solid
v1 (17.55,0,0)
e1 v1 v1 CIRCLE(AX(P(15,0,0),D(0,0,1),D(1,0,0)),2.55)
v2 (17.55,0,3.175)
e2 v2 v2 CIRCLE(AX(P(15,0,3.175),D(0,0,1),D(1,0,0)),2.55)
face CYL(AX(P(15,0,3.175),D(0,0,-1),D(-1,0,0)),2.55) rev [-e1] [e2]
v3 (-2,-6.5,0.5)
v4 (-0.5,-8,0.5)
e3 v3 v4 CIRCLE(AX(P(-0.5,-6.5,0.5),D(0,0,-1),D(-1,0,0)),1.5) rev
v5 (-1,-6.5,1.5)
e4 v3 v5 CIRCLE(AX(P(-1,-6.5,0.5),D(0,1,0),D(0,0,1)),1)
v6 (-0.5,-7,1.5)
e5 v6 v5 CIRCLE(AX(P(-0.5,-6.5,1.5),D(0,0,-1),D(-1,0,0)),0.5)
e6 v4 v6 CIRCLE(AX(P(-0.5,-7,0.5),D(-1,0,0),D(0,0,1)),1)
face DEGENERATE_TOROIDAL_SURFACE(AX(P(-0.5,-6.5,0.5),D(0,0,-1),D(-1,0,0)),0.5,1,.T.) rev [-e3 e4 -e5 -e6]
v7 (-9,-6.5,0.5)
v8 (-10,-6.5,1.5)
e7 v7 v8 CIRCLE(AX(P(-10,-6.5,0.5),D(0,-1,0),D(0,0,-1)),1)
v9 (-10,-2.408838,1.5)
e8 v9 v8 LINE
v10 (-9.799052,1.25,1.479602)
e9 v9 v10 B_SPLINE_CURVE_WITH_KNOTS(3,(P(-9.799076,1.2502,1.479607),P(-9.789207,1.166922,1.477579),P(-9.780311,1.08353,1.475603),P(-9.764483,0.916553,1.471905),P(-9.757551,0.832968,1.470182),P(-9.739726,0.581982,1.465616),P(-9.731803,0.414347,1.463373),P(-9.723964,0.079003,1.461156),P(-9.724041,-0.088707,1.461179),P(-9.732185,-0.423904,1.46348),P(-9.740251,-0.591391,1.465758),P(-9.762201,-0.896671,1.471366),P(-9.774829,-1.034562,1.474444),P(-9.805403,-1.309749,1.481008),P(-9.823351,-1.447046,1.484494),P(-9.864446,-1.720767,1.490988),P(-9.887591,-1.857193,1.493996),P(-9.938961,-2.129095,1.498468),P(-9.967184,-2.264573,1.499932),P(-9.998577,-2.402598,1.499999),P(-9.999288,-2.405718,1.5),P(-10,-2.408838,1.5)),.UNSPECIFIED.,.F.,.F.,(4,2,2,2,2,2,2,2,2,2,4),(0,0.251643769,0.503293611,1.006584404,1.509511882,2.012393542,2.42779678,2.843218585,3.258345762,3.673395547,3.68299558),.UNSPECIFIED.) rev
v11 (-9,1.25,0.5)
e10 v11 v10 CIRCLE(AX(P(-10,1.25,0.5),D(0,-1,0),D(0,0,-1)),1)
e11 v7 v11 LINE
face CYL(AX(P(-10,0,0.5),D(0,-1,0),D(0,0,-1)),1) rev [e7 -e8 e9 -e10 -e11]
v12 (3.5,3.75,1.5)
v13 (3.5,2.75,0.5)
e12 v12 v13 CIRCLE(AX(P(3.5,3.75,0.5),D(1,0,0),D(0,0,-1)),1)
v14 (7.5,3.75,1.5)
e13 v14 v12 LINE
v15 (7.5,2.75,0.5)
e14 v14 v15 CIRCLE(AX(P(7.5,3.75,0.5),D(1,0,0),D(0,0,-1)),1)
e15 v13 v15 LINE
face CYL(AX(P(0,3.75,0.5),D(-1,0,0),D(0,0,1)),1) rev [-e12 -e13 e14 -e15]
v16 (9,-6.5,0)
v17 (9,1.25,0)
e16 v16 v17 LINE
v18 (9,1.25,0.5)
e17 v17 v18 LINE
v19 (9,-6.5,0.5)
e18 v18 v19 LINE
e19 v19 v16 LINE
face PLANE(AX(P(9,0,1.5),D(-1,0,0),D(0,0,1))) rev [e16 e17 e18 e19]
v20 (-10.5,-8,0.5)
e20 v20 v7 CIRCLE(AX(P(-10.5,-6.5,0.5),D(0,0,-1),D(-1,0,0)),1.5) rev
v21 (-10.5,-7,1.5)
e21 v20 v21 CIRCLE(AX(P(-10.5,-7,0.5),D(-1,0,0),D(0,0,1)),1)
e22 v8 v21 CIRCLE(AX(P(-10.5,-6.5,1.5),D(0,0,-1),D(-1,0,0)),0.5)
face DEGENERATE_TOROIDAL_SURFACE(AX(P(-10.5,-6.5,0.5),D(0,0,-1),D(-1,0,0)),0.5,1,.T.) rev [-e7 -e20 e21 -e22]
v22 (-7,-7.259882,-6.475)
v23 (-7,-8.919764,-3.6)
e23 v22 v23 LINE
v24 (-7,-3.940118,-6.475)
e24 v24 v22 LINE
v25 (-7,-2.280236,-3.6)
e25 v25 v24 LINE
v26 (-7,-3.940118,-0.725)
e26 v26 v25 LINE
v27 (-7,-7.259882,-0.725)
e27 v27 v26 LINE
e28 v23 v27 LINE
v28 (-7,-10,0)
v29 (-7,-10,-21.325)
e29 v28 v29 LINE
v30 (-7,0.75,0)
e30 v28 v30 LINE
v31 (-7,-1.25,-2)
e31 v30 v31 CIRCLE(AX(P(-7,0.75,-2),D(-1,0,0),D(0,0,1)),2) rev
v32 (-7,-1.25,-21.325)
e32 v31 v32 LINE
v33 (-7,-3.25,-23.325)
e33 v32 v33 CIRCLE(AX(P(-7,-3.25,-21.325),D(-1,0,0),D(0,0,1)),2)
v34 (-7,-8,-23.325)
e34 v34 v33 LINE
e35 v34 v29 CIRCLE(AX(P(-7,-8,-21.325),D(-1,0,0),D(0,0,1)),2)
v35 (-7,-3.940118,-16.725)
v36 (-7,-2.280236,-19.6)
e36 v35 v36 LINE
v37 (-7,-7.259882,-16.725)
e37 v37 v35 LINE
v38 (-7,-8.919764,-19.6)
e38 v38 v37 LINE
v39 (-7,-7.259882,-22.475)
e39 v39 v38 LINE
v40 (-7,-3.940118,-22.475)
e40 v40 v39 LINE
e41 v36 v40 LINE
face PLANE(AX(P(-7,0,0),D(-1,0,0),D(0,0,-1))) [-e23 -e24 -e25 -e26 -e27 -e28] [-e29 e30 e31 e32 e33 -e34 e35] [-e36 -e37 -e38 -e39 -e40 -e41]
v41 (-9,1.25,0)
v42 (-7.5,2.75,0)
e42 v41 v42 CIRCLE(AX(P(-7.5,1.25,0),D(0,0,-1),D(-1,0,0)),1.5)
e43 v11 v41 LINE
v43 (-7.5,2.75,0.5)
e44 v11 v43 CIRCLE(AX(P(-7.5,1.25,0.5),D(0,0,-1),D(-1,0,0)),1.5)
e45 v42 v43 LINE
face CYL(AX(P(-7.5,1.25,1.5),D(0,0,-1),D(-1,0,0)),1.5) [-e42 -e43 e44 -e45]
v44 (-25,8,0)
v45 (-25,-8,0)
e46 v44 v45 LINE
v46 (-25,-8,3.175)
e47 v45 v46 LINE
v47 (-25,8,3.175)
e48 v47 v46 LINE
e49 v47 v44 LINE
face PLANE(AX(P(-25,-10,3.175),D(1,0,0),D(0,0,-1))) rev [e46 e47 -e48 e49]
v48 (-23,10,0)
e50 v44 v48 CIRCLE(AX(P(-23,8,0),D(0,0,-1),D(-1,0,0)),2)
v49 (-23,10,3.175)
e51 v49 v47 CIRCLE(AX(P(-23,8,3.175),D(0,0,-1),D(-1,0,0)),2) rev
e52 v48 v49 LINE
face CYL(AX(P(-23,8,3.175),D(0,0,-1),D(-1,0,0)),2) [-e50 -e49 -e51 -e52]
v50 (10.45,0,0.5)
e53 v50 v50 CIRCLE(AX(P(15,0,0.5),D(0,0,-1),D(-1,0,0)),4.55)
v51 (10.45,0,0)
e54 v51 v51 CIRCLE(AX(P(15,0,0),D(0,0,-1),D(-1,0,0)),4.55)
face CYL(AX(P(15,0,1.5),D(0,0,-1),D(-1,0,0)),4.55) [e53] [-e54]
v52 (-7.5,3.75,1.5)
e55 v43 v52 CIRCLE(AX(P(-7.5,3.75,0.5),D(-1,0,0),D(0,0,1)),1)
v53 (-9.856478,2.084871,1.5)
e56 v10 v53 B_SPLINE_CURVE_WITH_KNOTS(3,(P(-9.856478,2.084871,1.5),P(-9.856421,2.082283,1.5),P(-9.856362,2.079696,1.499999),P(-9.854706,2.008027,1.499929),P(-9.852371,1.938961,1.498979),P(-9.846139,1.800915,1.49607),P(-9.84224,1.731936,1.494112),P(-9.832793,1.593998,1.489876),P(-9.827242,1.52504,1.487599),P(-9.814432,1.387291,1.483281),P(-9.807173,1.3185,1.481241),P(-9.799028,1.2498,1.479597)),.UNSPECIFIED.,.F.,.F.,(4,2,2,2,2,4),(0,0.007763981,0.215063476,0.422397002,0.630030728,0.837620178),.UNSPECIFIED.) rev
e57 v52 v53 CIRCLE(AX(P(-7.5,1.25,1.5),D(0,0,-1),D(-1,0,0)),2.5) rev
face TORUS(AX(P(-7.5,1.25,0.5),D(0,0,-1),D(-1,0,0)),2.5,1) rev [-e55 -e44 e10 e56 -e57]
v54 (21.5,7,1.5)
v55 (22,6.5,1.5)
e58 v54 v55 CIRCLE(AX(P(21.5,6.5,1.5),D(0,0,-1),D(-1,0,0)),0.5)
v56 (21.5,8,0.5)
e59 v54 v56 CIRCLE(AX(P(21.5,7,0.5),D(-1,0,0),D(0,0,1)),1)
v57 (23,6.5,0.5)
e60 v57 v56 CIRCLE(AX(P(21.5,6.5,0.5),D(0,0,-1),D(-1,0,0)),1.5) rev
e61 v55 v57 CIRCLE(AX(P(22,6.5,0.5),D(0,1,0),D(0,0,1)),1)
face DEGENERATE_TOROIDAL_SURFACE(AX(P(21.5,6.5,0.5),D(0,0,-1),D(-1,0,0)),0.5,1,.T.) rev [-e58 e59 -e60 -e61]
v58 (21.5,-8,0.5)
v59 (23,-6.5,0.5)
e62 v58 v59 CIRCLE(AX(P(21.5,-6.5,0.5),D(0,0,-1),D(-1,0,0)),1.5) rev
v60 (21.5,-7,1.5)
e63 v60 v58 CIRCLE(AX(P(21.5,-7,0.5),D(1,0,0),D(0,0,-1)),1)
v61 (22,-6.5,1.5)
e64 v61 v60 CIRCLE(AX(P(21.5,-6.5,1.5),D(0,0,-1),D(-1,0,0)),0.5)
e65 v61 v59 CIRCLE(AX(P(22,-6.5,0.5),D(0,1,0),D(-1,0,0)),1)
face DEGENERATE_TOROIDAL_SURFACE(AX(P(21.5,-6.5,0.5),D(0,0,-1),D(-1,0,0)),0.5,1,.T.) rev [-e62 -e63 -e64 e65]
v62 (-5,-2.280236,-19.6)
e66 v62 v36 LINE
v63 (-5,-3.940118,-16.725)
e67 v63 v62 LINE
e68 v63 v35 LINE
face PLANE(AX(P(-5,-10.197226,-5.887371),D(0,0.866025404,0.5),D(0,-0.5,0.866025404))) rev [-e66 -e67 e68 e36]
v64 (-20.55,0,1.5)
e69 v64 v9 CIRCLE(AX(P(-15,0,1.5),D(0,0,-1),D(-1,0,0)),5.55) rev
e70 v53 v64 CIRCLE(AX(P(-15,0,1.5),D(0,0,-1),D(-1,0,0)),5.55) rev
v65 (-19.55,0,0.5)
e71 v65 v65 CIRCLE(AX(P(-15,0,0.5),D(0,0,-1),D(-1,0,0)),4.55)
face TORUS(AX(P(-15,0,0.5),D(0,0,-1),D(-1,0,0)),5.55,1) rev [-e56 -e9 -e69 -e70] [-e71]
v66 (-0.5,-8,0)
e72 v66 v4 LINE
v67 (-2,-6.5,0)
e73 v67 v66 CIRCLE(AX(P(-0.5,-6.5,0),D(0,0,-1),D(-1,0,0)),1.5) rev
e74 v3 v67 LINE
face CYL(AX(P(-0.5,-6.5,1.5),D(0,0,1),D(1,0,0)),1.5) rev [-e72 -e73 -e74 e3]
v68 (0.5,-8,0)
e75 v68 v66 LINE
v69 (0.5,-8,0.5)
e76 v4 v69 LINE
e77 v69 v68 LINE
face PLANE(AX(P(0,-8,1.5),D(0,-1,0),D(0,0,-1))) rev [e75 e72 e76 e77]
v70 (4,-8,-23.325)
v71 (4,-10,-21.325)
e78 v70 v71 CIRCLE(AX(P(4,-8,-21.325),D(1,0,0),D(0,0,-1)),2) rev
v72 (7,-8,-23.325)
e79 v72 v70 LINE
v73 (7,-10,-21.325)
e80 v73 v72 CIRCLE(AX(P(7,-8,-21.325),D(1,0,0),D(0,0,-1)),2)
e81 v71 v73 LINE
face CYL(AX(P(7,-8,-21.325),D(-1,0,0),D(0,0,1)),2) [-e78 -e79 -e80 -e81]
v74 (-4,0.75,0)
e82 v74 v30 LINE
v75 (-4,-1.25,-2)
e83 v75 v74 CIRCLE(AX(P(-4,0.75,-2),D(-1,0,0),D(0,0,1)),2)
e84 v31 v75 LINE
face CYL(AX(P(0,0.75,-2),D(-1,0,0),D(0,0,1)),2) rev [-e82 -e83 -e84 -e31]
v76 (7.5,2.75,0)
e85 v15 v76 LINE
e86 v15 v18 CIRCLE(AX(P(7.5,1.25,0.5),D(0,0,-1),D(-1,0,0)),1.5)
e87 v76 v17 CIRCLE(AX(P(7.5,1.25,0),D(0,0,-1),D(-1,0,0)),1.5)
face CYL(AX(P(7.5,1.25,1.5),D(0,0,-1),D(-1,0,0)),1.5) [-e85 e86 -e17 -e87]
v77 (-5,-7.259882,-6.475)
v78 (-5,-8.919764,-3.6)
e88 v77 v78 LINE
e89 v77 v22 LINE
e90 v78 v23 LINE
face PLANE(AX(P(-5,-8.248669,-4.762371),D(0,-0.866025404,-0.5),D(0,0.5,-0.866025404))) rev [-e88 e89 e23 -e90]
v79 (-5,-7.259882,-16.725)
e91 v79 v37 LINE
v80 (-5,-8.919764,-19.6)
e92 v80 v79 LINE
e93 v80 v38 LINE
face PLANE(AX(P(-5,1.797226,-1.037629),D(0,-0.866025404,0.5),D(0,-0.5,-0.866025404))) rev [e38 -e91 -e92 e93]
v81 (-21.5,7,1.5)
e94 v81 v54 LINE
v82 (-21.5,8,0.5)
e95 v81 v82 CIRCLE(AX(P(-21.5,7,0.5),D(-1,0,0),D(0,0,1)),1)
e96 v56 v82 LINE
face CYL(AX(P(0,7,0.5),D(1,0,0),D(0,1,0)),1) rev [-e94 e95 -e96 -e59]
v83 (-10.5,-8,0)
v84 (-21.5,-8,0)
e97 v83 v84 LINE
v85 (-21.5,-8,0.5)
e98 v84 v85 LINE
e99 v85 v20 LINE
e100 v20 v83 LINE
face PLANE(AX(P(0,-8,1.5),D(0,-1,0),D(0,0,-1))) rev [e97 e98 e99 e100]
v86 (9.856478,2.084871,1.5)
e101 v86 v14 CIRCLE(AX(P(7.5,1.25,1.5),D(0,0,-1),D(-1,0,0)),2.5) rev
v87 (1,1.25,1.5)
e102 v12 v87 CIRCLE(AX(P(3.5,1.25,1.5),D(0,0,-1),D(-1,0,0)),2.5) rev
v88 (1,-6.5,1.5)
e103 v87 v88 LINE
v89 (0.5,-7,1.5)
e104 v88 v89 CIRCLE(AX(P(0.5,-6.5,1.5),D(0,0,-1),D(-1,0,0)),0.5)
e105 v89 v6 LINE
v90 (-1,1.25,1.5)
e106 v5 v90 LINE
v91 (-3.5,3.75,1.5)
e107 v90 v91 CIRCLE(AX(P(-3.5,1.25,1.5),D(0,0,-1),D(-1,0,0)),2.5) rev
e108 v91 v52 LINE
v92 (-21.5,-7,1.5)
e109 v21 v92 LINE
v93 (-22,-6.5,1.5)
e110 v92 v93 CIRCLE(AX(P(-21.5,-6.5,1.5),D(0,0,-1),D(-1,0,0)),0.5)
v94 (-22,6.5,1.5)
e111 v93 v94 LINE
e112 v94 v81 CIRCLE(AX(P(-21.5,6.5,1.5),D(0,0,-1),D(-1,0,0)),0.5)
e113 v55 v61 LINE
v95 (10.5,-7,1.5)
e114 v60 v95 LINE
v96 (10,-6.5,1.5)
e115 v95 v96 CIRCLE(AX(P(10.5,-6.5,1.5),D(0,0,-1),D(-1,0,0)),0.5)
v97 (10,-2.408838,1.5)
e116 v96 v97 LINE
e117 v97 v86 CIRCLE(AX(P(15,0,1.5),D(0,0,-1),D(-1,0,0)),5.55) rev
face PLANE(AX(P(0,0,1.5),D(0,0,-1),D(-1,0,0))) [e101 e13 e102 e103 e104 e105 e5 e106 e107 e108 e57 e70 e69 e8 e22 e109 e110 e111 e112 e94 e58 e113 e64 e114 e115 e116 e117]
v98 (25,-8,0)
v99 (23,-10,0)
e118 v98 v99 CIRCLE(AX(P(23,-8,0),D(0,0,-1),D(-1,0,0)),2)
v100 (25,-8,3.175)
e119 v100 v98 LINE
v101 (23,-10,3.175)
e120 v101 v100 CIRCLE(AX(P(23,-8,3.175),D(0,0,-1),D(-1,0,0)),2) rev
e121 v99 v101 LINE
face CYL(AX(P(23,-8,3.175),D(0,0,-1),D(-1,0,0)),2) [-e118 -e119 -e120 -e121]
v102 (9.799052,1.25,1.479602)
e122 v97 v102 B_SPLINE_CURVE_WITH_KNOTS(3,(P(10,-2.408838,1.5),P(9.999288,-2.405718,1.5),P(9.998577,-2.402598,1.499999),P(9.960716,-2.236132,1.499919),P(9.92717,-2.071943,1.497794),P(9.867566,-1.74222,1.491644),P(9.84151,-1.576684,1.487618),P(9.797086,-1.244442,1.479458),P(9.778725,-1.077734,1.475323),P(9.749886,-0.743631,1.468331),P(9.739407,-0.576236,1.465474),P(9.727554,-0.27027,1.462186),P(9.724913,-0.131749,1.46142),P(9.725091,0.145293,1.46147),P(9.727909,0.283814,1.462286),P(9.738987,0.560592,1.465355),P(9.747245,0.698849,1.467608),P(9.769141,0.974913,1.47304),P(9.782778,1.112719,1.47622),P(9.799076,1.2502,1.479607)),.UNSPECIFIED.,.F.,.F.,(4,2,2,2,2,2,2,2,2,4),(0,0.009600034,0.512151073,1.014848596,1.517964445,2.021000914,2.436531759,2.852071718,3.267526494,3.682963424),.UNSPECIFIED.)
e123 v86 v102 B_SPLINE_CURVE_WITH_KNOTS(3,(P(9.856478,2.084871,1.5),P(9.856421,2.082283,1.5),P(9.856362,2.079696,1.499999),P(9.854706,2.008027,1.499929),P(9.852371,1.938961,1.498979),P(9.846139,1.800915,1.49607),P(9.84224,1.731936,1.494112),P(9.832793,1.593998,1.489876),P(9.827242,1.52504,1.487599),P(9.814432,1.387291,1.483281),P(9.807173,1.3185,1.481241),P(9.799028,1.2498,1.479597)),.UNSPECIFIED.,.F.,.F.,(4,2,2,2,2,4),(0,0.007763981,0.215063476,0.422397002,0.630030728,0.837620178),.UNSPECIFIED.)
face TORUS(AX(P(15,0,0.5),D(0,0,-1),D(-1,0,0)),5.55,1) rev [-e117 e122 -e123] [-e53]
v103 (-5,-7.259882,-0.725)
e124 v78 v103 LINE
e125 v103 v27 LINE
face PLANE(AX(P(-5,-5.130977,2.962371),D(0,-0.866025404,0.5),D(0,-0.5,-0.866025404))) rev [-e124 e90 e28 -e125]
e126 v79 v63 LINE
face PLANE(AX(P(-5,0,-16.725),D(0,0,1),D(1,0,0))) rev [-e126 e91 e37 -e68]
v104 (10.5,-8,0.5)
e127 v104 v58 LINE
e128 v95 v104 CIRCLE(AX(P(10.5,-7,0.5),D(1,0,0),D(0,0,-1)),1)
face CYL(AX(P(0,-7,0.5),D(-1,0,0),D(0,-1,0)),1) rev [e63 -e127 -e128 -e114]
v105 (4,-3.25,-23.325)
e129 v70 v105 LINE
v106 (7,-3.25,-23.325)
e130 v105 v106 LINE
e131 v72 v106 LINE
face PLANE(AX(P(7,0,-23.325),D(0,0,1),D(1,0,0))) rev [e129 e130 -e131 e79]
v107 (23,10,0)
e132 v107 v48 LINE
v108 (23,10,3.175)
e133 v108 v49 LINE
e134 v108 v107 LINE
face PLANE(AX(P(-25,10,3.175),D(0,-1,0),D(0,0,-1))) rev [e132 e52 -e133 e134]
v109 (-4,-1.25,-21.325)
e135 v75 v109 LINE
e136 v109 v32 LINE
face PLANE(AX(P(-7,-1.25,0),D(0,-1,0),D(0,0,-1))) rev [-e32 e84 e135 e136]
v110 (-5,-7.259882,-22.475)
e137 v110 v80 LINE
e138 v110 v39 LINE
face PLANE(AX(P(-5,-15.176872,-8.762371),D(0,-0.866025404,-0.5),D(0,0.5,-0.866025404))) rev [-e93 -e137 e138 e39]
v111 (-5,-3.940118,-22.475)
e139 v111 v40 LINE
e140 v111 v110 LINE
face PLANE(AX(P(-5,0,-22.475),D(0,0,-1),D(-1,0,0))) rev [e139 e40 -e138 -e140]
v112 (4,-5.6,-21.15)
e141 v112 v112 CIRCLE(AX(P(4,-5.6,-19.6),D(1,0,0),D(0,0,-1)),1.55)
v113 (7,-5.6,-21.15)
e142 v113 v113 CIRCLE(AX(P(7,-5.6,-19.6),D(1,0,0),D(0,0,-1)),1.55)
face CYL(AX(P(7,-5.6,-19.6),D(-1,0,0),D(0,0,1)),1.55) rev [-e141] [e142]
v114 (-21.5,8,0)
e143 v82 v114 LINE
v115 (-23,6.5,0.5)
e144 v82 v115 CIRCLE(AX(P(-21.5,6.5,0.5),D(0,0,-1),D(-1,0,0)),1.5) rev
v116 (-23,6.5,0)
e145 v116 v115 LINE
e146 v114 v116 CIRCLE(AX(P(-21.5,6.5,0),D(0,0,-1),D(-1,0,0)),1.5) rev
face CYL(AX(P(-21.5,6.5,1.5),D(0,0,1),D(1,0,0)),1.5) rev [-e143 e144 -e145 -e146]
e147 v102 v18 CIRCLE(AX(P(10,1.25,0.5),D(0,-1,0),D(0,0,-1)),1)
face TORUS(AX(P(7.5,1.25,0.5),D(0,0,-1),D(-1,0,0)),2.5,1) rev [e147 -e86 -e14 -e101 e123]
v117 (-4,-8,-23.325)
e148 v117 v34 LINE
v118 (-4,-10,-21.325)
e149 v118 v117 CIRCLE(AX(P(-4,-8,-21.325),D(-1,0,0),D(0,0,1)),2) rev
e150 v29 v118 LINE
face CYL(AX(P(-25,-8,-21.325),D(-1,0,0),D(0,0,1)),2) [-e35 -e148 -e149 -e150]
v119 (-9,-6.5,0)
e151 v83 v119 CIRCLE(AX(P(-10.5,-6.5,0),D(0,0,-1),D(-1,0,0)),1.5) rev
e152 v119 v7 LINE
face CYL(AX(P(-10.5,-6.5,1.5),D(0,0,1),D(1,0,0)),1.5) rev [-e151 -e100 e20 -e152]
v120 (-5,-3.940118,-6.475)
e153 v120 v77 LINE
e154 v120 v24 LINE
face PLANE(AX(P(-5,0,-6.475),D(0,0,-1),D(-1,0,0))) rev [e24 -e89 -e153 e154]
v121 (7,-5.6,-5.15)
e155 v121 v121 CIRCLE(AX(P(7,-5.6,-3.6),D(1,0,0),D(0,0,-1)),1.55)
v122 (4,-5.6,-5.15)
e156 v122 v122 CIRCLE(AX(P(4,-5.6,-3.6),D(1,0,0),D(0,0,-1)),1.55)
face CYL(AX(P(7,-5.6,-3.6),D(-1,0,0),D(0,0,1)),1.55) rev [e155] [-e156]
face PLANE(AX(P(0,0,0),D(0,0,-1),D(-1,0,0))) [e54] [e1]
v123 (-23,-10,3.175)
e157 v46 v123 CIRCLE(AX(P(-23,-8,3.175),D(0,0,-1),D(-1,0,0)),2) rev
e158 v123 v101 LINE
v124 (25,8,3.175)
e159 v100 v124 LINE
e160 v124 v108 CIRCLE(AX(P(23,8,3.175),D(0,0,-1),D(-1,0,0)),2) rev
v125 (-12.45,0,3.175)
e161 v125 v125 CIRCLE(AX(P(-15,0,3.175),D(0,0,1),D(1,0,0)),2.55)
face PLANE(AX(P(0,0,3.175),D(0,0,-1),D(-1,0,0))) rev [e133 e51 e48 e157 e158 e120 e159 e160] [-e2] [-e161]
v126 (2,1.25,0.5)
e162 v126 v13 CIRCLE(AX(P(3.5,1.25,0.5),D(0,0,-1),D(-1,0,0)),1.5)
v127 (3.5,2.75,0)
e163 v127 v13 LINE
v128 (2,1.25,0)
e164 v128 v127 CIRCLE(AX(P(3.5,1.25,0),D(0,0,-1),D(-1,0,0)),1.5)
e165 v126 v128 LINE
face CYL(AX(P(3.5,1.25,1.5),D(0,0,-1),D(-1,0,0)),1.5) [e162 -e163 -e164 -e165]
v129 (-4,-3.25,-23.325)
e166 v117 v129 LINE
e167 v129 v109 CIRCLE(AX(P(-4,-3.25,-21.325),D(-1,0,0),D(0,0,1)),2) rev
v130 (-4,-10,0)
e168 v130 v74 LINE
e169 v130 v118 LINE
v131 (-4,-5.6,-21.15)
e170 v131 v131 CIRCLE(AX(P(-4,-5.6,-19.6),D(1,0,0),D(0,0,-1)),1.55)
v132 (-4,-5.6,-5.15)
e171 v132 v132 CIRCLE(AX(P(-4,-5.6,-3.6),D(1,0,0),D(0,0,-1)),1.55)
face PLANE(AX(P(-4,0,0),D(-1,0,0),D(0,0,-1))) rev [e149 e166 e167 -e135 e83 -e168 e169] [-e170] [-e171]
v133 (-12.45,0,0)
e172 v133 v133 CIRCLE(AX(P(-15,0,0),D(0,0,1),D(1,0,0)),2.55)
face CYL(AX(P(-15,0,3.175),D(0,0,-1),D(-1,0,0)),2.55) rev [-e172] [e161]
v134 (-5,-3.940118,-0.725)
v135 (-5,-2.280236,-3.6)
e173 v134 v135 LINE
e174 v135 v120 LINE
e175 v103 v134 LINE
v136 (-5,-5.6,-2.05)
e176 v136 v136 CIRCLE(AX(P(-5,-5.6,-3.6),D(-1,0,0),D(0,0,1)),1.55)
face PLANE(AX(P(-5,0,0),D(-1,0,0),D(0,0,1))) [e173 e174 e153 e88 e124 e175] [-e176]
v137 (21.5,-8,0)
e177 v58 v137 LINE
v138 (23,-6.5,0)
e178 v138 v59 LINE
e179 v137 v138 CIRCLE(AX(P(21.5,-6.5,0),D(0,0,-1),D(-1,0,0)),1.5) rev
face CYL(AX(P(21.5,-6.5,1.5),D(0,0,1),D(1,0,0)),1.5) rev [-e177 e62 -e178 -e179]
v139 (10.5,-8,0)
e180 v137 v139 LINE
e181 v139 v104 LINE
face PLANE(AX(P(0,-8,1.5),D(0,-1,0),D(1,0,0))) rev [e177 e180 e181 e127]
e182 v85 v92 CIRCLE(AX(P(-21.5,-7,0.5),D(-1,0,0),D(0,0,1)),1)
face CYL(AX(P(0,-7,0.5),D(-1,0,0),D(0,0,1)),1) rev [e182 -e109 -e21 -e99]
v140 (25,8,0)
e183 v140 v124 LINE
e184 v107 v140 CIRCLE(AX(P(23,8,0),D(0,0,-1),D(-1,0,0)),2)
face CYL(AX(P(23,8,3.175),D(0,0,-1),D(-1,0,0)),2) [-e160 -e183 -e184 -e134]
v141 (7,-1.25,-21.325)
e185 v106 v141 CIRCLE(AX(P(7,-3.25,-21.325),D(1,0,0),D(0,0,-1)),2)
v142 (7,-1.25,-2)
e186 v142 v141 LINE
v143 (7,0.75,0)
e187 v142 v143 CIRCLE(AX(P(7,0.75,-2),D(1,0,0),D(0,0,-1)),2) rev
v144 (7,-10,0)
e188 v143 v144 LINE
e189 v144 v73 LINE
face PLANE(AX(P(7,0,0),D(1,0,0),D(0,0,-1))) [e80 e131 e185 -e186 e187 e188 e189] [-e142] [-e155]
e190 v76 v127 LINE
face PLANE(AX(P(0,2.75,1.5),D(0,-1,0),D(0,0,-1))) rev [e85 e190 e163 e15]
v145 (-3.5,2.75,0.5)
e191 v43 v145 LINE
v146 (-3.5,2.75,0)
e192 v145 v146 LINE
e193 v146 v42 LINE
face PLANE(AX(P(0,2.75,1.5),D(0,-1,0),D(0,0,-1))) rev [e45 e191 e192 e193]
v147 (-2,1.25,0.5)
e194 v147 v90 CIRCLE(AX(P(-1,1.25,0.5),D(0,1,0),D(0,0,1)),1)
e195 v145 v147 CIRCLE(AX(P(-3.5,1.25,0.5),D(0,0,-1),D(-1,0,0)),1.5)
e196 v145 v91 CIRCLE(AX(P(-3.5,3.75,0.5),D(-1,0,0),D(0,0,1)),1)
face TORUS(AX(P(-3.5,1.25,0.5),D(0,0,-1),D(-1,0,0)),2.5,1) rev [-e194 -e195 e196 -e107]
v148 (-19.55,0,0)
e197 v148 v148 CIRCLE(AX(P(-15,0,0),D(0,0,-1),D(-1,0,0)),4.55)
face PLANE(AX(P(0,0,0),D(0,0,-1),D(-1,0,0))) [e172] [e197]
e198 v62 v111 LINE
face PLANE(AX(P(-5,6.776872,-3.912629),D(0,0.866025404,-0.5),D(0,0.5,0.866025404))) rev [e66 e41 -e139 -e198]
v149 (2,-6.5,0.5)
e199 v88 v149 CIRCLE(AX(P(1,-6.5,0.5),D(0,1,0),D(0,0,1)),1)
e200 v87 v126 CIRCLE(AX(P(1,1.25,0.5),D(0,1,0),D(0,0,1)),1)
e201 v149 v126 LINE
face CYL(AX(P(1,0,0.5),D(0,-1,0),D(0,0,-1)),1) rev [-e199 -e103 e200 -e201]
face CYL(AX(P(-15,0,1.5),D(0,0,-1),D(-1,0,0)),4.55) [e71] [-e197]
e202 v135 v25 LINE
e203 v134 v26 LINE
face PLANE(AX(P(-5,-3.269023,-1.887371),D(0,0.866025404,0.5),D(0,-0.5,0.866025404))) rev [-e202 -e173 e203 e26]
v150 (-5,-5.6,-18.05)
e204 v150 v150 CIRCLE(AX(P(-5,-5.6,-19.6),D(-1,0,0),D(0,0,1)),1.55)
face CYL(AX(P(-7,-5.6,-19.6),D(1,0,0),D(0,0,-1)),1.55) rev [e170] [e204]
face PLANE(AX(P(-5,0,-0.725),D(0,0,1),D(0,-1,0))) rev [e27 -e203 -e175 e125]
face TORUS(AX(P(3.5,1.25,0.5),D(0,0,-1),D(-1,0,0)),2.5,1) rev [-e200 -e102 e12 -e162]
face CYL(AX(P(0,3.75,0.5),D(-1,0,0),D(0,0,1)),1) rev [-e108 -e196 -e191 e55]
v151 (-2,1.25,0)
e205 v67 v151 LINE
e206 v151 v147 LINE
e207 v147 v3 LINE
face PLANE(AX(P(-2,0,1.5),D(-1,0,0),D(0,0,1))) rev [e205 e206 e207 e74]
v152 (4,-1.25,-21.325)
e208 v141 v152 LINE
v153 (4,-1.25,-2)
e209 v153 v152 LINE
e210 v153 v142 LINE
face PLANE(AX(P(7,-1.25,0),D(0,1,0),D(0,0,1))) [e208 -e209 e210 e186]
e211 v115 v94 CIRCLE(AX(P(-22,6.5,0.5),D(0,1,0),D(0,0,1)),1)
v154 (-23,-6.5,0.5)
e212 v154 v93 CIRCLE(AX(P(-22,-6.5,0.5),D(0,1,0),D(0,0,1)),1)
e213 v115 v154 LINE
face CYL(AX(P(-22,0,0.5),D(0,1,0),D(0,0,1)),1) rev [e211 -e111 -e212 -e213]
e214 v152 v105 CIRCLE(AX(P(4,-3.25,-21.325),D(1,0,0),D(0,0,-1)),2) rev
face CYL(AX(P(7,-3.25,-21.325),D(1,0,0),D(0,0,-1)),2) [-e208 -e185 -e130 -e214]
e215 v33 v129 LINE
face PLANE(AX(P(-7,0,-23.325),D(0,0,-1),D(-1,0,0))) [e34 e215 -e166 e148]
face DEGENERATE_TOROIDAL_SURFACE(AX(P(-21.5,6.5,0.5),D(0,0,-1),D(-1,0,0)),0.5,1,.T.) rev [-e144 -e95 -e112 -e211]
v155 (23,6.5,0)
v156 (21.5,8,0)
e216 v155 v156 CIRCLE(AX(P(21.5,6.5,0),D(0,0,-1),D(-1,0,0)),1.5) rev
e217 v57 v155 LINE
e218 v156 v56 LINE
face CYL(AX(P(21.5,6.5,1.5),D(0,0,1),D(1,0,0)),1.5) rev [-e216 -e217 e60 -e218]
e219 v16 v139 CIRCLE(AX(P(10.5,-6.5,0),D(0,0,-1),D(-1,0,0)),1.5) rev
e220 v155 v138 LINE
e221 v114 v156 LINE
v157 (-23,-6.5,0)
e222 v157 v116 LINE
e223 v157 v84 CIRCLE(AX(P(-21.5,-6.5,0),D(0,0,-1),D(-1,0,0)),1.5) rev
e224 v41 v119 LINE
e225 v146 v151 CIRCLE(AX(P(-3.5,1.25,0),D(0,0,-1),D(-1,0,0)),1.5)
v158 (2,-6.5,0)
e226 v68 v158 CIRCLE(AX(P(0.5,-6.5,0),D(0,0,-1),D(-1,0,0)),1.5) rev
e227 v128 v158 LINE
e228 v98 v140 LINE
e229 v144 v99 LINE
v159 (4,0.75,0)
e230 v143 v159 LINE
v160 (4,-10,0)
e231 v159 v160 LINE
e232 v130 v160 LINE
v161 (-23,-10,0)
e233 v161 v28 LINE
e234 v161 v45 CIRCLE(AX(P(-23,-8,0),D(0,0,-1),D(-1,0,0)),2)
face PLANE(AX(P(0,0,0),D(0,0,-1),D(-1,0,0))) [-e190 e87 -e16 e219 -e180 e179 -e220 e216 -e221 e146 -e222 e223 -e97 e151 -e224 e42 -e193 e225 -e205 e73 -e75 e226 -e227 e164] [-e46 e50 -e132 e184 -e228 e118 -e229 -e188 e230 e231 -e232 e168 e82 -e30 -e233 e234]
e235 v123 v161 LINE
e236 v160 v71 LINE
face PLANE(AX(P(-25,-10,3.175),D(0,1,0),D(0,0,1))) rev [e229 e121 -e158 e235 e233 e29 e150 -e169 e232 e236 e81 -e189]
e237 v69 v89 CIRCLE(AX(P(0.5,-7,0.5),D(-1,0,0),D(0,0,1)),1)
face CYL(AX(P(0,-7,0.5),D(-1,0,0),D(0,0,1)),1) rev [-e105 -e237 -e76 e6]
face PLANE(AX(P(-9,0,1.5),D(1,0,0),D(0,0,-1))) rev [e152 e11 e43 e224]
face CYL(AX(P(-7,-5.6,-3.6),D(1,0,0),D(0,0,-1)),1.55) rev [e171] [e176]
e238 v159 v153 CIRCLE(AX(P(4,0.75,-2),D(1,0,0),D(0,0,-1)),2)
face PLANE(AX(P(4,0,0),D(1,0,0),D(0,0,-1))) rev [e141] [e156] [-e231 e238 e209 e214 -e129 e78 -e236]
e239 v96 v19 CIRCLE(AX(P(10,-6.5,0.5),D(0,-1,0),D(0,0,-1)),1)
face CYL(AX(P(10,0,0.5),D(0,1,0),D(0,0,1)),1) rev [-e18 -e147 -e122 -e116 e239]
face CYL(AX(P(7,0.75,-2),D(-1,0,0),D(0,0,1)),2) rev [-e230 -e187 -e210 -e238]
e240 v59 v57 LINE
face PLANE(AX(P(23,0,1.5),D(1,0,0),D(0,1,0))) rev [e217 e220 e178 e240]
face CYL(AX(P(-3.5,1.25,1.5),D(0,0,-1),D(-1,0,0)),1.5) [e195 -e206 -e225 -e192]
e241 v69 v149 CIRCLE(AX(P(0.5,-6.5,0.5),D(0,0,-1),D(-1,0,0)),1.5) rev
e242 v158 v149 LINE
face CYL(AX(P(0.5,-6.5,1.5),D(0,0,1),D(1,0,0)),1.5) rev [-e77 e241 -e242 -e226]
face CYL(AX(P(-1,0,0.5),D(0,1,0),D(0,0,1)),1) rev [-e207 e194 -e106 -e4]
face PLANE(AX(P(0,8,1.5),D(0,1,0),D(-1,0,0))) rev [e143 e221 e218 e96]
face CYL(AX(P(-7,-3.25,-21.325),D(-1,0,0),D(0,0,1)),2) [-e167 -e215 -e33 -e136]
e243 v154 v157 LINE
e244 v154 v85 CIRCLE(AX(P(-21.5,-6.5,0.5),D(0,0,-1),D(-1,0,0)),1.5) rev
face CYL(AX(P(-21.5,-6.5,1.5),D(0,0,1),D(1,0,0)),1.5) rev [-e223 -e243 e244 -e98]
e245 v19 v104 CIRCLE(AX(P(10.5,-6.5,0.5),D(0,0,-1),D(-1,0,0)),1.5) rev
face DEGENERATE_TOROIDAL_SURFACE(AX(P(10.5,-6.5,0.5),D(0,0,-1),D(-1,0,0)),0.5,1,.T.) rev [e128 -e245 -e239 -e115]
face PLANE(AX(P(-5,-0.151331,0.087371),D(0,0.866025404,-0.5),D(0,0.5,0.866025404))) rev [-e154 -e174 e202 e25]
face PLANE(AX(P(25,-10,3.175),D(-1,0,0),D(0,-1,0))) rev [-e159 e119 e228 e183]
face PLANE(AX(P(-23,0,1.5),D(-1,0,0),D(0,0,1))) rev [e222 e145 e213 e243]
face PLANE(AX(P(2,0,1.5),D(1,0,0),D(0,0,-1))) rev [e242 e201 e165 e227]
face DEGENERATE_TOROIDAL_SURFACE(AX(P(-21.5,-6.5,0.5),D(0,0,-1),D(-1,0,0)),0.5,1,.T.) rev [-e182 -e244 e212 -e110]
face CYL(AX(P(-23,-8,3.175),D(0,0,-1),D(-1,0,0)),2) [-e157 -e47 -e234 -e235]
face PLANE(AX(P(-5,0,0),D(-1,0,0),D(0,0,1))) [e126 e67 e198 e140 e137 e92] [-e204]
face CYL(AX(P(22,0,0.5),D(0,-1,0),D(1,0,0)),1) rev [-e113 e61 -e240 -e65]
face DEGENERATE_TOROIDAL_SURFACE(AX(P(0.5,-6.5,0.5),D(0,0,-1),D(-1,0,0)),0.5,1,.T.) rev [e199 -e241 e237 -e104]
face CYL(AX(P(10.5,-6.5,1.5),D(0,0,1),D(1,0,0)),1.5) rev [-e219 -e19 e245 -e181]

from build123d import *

# Parameters (mm, degrees)
SKETCH1_W           = 50
SKETCH1_H           = 20
SKETCH1_R           = 2.55
BOSS_EXTRUDE1_DEPTH = 3.175
BOSS_EXTRUDE2_START = 4
SKETCH3_W           = 26.5
SKETCH3_H           = 8.75
SKETCH3_R           = 1.55
BOSS_EXTRUDE2_DEPTH = 3
CUT_EXTRUDE1_START  = -7
SKETCH3_3_R         = 1.55
CUT_EXTRUDE1_DEPTH  = 2
FILLET1_R           = 2
FILLET2_R           = 2
SKETCH4_R           = 4.55
CUT_EXTRUDE2_DEPTH  = 1.5
FILLET3_R           = 1.5
FILLET4_R           = 1


with BuildPart() as part:
    # Sketch1 → Boss-Extrude1 (new body)
    with BuildSketch(Plane.XY):
        Rectangle(SKETCH1_W, SKETCH1_H)
        with Locations((-15, 0)):
            Circle(SKETCH1_R, mode=Mode.SUBTRACT)
        with Locations((15, 0)):
            Circle(SKETCH1_R, mode=Mode.SUBTRACT)
    extrude(amount=BOSS_EXTRUDE1_DEPTH)

    # Sketch3 → Boss-Extrude2 (add)
    # profile 1 of 3: a face of its own
    with BuildSketch(Plane(origin=(0, 0, 0), x_dir=(0, 0, -1), z_dir=(1, 0, 0)).offset(BOSS_EXTRUDE2_START)):
        with Locations((10.075, -5.625)):
            Rectangle(SKETCH3_W, SKETCH3_H)
        Polygon((22.475, -7.259882024), (22.475, -3.940117976), (19.6, -2.280235952), (16.725, -3.940117976), (16.725, -7.259882024), (19.6, -8.919764048), align=None, mode=Mode.SUBTRACT)
        Polygon((6.475, -7.259882024), (6.475, -3.940117976), (3.6, -2.280235952), (0.725, -3.940117976), (0.725, -7.259882024), (3.6, -8.919764048), align=None, mode=Mode.SUBTRACT)
    # profile 2 of 3: a face of its own
    with BuildSketch(Plane(origin=(0, 0, 0), x_dir=(0, 0, -1), z_dir=(1, 0, 0)).offset(BOSS_EXTRUDE2_START)):
        Polygon((3.6, -8.919764048), (6.475, -7.259882024), (6.475, -3.940117976), (3.6, -2.280235952), (0.725, -3.940117976), (0.725, -7.259882024), align=None)
        with Locations((3.6, -5.6)):
            Circle(SKETCH3_R, mode=Mode.SUBTRACT)
    # profile 3 of 3: a face of its own
    with BuildSketch(Plane(origin=(0, 0, 0), x_dir=(0, 0, -1), z_dir=(1, 0, 0)).offset(BOSS_EXTRUDE2_START)):
        Polygon((19.6, -8.919764048), (22.475, -7.259882024), (22.475, -3.940117976), (19.6, -2.280235952), (16.725, -3.940117976), (16.725, -7.259882024), align=None)
        with Locations((19.6, -5.6)):
            Circle(SKETCH3_R, mode=Mode.SUBTRACT)
    boss_extrude2 = extrude(amount=BOSS_EXTRUDE2_DEPTH)

    # Mirror1: Boss-Extrude2 across plane
    add(boss_extrude2.mirror(Plane(origin=(0, 0, 0), x_dir=(0, 0, 1), z_dir=(1, 0, 0))))

    # Sketch3<3> → Cut-Extrude1 (cut)
    # profile 1 of 2: a face of its own
    with BuildSketch(Plane(origin=(0, 0, 0), x_dir=(0, 0, -1), z_dir=(1, 0, 0)).offset(CUT_EXTRUDE1_START)):
        Polygon((3.6, -8.919764048), (6.475, -7.259882024), (6.475, -3.940117976), (3.6, -2.280235952), (0.725, -3.940117976), (0.725, -7.259882024), align=None)
        with Locations((3.6, -5.6)):
            Circle(SKETCH3_3_R, mode=Mode.SUBTRACT)
    # profile 2 of 2: a face of its own
    with BuildSketch(Plane(origin=(0, 0, 0), x_dir=(0, 0, -1), z_dir=(1, 0, 0)).offset(CUT_EXTRUDE1_START)):
        Polygon((19.6, -8.919764048), (22.475, -7.259882024), (22.475, -3.940117976), (19.6, -2.280235952), (16.725, -3.940117976), (16.725, -7.259882024), align=None)
        with Locations((19.6, -5.6)):
            Circle(SKETCH3_3_R, mode=Mode.SUBTRACT)
    extrude(amount=CUT_EXTRUDE1_DEPTH, mode=Mode.SUBTRACT)

    # Fillet1
    fillet1_edges = [part.edges().sort_by_distance(p)[0] for p in [
        (5.5, -1.25, 0),
        (-5.5, -1.25, 0),
    ]]
    fillet(fillet1_edges, radius=FILLET1_R)

    # Fillet2
    fillet2_edges = [part.edges().sort_by_distance(p)[0] for p in [
        (5.5, -10, -23.325),
        (5.5, -1.25, -23.325),
        (-5.5, -10, -23.325),
        (-5.5, -1.25, -23.325),
        (25, -10, 1.5875),
        (-25, -10, 1.5875),
        (-25, 10, 1.5875),
        (25, 10, 1.5875),
    ]]
    fillet(fillet2_edges, radius=FILLET2_R)

    # Sketch4 → Cut-Extrude2 (cut)
    with BuildSketch(Plane(origin=(0, 0, 0), x_dir=(-1, 0, 0), z_dir=(0, 0, -1))):
        Polygon((9, 2.75), (9, -8), (23, -8), (23, 8), (-23, 8), (-23, -8), (-9, -8), (-9, 2.75), (-2, 2.75), (-2, -8), (2, -8), (2, 2.75), align=None)
        with Locations((15, 0)):
            Circle(SKETCH4_R, mode=Mode.SUBTRACT)
        with Locations((-15, 0)):
            Circle(SKETCH4_R, mode=Mode.SUBTRACT)
    extrude(amount=-CUT_EXTRUDE2_DEPTH, mode=Mode.SUBTRACT)

    # Fillet3
    fillet3_edges = [part.edges().sort_by_distance(p)[0] for p in [
        (-9, -8, 0.75),
        (-9, 2.75, 0.75),
        (-2, 2.75, 0.75),
        (-2, -8, 0.75),
        (2, -8, 0.75),
        (2, 2.75, 0.75),
        (9, 2.75, 0.75),
        (9, -8, 0.75),
        (23, -8, 0.75),
        (23, 8, 0.75),
        (-23, 8, 0.75),
        (-23, -8, 0.75),
    ]]
    fillet(fillet3_edges, radius=FILLET3_R)

    # Fillet4
    # the kernel refuses this fillet: 1 mm, written as the material it adds along each edge
    with BuildSketch(Plane(origin=(-15, 0, 1.5), x_dir=(-1, 0, 0), z_dir=(0, -1, 0))) as fillet4_piece_1:
        with BuildLine():
            CenterArc((4.55 + FILLET4_R, FILLET4_R), FILLET4_R, 180, 90)
            Line((4.55, FILLET4_R), (4.55, 0))
            Line((4.55, 0), (4.55 + FILLET4_R, 0))
        make_face()
    revolve(axis=Axis((-15, 0, 1.5), (0, 0, -1)))
    with BuildSketch(Plane(origin=(15, 0, 1.5), x_dir=(-1, 0, 0), z_dir=(0, -1, 0))) as fillet4_piece_2:
        with BuildLine():
            CenterArc((4.55 + FILLET4_R, FILLET4_R), FILLET4_R, 180, 90)
            Line((4.55, FILLET4_R), (4.55, 0))
            Line((4.55, 0), (4.55 + FILLET4_R, 0))
        make_face()
    revolve(axis=Axis((15, 0, 1.5), (0, 0, -1)))
    with BuildSketch(Plane(origin=(-9, 1.25, 1.5), x_dir=(0, 0, -1), z_dir=(0, -1, 0)), Plane(origin=(-2, -6.5, 1.5), x_dir=(0, 0, -1), z_dir=(0, 1, 0)), Plane(origin=(9, -6.5, 1.5), x_dir=(0, 0, -1), z_dir=(0, 1, 0)), Plane(origin=(2, 1.25, 1.5), x_dir=(0, 0, -1), z_dir=(0, -1, 0))) as fillet4_piece_3:
        with BuildLine():
            CenterArc((FILLET4_R, -FILLET4_R), FILLET4_R, 90, 90)
            Line((0, -FILLET4_R), (0, 0))
            Line((0, 0), (FILLET4_R, 0))
        make_face()
    extrude(amount=7.75)
    with BuildSketch(Plane(origin=(-3.5, 2.75, 1.5), x_dir=(0, 0, -1), z_dir=(-1, 0, 0)), Plane(origin=(7.5, 2.75, 1.5), x_dir=(0, 0, -1), z_dir=(-1, 0, 0))) as fillet4_piece_4:
        with BuildLine():
            CenterArc((FILLET4_R, -FILLET4_R), FILLET4_R, 90, 90)
            Line((0, -FILLET4_R), (0, 0))
            Line((0, 0), (FILLET4_R, 0))
        make_face()
    extrude(amount=4)
    with BuildSketch(Plane(origin=(0.5, -8, 1.5), x_dir=(0, 0, -1), z_dir=(-1, 0, 0))) as fillet4_piece_5:
        with BuildLine():
            CenterArc((FILLET4_R, -FILLET4_R), FILLET4_R, 90, 90)
            Line((0, -FILLET4_R), (0, 0))
            Line((0, 0), (FILLET4_R, 0))
        make_face()
    extrude(amount=1)
    with BuildSketch(Plane(origin=(-10.5, -8, 1.5), x_dir=(0, 0, -1), z_dir=(-1, 0, 0)), Plane(origin=(21.5, -8, 1.5), x_dir=(0, 0, -1), z_dir=(-1, 0, 0))) as fillet4_piece_6:
        with BuildLine():
            CenterArc((FILLET4_R, -FILLET4_R), FILLET4_R, 90, 90)
            Line((0, -FILLET4_R), (0, 0))
            Line((0, 0), (FILLET4_R, 0))
        make_face()
    extrude(amount=11)
    with BuildSketch(Plane(origin=(-23, -6.5, 1.5), x_dir=(0, 0, -1), z_dir=(0, 1, 0)), Plane(origin=(23, 6.5, 1.5), x_dir=(0, 0, -1), z_dir=(0, -1, 0))) as fillet4_piece_7:
        with BuildLine():
            CenterArc((FILLET4_R, -FILLET4_R), FILLET4_R, 90, 90)
            Line((0, -FILLET4_R), (0, 0))
            Line((0, 0), (FILLET4_R, 0))
        make_face()
    extrude(amount=13)
    with BuildSketch(Plane(origin=(-21.5, 8, 1.5), x_dir=(0, 0, -1), z_dir=(1, 0, 0))) as fillet4_piece_8:
        with BuildLine():
            CenterArc((FILLET4_R, -FILLET4_R), FILLET4_R, 90, 90)
            Line((0, -FILLET4_R), (0, 0))
            Line((0, 0), (FILLET4_R, 0))
        make_face()
    extrude(amount=43)
    with BuildSketch(Plane(origin=(21.5, 6.5, 1.5), x_dir=(1, 0, 0), z_dir=(0, -1, 0))) as fillet4_piece_9:
        with BuildLine():
            CenterArc((1.5 - FILLET4_R, -FILLET4_R), FILLET4_R, 0, 90)
            Line((1.5 - FILLET4_R, 0), (1.5, 0))
            Line((1.5, 0), (1.5, -FILLET4_R))
        make_face()
    revolve(axis=Axis((21.5, 6.5, 1.5), (0, 0, 1)), revolution_arc=90)
    with BuildSketch(Plane(origin=(-10.5, -6.5, 1.5), x_dir=(0, -1, 0), z_dir=(-1, 0, 0))) as fillet4_piece_10:
        with BuildLine():
            CenterArc((1.5 - FILLET4_R, -FILLET4_R), FILLET4_R, 0, 90)
            Line((1.5 - FILLET4_R, 0), (1.5, 0))
            Line((1.5, 0), (1.5, -FILLET4_R))
        make_face()
    revolve(axis=Axis((-10.5, -6.5, 1.5), (0, 0, 1)), revolution_arc=90)
    with BuildSketch(Plane(origin=(-21.5, -6.5, 1.5), x_dir=(-1, 0, 0), z_dir=(0, 1, 0))) as fillet4_piece_11:
        with BuildLine():
            CenterArc((1.5 - FILLET4_R, -FILLET4_R), FILLET4_R, 0, 90)
            Line((1.5 - FILLET4_R, 0), (1.5, 0))
            Line((1.5, 0), (1.5, -FILLET4_R))
        make_face()
    revolve(axis=Axis((-21.5, -6.5, 1.5), (0, 0, 1)), revolution_arc=90)
    with BuildSketch(Plane(origin=(-21.5, 6.5, 1.5), x_dir=(0, 1, 0), z_dir=(1, 0, 0))) as fillet4_piece_12:
        with BuildLine():
            CenterArc((1.5 - FILLET4_R, -FILLET4_R), FILLET4_R, 0, 90)
            Line((1.5 - FILLET4_R, 0), (1.5, 0))
            Line((1.5, 0), (1.5, -FILLET4_R))
        make_face()
    revolve(axis=Axis((-21.5, 6.5, 1.5), (0, 0, 1)), revolution_arc=90)
    with BuildSketch(Plane(origin=(21.5, -6.5, 1.5), x_dir=(0, -1, 0), z_dir=(-1, 0, 0))) as fillet4_piece_13:
        with BuildLine():
            CenterArc((1.5 - FILLET4_R, -FILLET4_R), FILLET4_R, 0, 90)
            Line((1.5 - FILLET4_R, 0), (1.5, 0))
            Line((1.5, 0), (1.5, -FILLET4_R))
        make_face()
    revolve(axis=Axis((21.5, -6.5, 1.5), (0, 0, 1)), revolution_arc=90)
    with BuildSketch(Plane(origin=(10.5, -6.5, 1.5), x_dir=(-1, 0, 0), z_dir=(0, 1, 0))) as fillet4_piece_14:
        with BuildLine():
            CenterArc((1.5 - FILLET4_R, -FILLET4_R), FILLET4_R, 0, 90)
            Line((1.5 - FILLET4_R, 0), (1.5, 0))
            Line((1.5, 0), (1.5, -FILLET4_R))
        make_face()
    revolve(axis=Axis((10.5, -6.5, 1.5), (0, 0, 1)), revolution_arc=90)
    with BuildSketch(Plane(origin=(0.5, -6.5, 1.5), x_dir=(0, -1, 0), z_dir=(-1, 0, 0))) as fillet4_piece_15:
        with BuildLine():
            CenterArc((1.5 - FILLET4_R, -FILLET4_R), FILLET4_R, 0, 90)
            Line((1.5 - FILLET4_R, 0), (1.5, 0))
            Line((1.5, 0), (1.5, -FILLET4_R))
        make_face()
    revolve(axis=Axis((0.5, -6.5, 1.5), (0, 0, 1)), revolution_arc=90)
    with BuildSketch(Plane(origin=(-0.5, -6.5, 1.5), x_dir=(-1, 0, 0), z_dir=(0, 1, 0))) as fillet4_piece_16:
        with BuildLine():
            CenterArc((1.5 - FILLET4_R, -FILLET4_R), FILLET4_R, 0, 90)
            Line((1.5 - FILLET4_R, 0), (1.5, 0))
            Line((1.5, 0), (1.5, -FILLET4_R))
        make_face()
    revolve(axis=Axis((-0.5, -6.5, 1.5), (0, 0, 1)), revolution_arc=90)
    with BuildSketch(Plane(origin=(-7.5, 1.25, 1.5), x_dir=(0, 1, 0), z_dir=(1, 0, 0))) as fillet4_piece_17:
        with BuildLine():
            CenterArc((1.5 + FILLET4_R, -FILLET4_R), FILLET4_R, 90, 90)
            Line((1.5 + FILLET4_R, 0), (1.5, 0))
            Line((1.5, 0), (1.5, -FILLET4_R))
        make_face()
    revolve(axis=Axis((-7.5, 1.25, 1.5), (0, 0, 1)), revolution_arc=90)
    with BuildSketch(Plane(origin=(-3.5, 1.25, 1.5), x_dir=(0, 1, 0), z_dir=(-1, 0, 0))) as fillet4_piece_18:
        with BuildLine():
            CenterArc((1.5 + FILLET4_R, FILLET4_R), FILLET4_R, 180, 90)
            Line((1.5 + FILLET4_R, 0), (1.5, 0))
            Line((1.5, 0), (1.5, FILLET4_R))
        make_face()
    revolve(axis=Axis((-3.5, 1.25, 1.5), (0, 0, -1)), revolution_arc=90)
    with BuildSketch(Plane(origin=(3.5, 1.25, 1.5), x_dir=(-1, 0, 0), z_dir=(0, -1, 0))) as fillet4_piece_19:
        with BuildLine():
            CenterArc((1.5 + FILLET4_R, FILLET4_R), FILLET4_R, 180, 90)
            Line((1.5 + FILLET4_R, 0), (1.5, 0))
            Line((1.5, 0), (1.5, FILLET4_R))
        make_face()
    revolve(axis=Axis((3.5, 1.25, 1.5), (0, 0, -1)), revolution_arc=90)
    with BuildSketch(Plane(origin=(7.5, 1.25, 1.5), x_dir=(0, 1, 0), z_dir=(-1, 0, 0))) as fillet4_piece_20:
        with BuildLine():
            CenterArc((1.5 + FILLET4_R, FILLET4_R), FILLET4_R, 180, 90)
            Line((1.5 + FILLET4_R, 0), (1.5, 0))
            Line((1.5, 0), (1.5, FILLET4_R))
        make_face()
    revolve(axis=Axis((7.5, 1.25, 1.5), (0, 0, -1)), revolution_arc=90)


solid = part.part
